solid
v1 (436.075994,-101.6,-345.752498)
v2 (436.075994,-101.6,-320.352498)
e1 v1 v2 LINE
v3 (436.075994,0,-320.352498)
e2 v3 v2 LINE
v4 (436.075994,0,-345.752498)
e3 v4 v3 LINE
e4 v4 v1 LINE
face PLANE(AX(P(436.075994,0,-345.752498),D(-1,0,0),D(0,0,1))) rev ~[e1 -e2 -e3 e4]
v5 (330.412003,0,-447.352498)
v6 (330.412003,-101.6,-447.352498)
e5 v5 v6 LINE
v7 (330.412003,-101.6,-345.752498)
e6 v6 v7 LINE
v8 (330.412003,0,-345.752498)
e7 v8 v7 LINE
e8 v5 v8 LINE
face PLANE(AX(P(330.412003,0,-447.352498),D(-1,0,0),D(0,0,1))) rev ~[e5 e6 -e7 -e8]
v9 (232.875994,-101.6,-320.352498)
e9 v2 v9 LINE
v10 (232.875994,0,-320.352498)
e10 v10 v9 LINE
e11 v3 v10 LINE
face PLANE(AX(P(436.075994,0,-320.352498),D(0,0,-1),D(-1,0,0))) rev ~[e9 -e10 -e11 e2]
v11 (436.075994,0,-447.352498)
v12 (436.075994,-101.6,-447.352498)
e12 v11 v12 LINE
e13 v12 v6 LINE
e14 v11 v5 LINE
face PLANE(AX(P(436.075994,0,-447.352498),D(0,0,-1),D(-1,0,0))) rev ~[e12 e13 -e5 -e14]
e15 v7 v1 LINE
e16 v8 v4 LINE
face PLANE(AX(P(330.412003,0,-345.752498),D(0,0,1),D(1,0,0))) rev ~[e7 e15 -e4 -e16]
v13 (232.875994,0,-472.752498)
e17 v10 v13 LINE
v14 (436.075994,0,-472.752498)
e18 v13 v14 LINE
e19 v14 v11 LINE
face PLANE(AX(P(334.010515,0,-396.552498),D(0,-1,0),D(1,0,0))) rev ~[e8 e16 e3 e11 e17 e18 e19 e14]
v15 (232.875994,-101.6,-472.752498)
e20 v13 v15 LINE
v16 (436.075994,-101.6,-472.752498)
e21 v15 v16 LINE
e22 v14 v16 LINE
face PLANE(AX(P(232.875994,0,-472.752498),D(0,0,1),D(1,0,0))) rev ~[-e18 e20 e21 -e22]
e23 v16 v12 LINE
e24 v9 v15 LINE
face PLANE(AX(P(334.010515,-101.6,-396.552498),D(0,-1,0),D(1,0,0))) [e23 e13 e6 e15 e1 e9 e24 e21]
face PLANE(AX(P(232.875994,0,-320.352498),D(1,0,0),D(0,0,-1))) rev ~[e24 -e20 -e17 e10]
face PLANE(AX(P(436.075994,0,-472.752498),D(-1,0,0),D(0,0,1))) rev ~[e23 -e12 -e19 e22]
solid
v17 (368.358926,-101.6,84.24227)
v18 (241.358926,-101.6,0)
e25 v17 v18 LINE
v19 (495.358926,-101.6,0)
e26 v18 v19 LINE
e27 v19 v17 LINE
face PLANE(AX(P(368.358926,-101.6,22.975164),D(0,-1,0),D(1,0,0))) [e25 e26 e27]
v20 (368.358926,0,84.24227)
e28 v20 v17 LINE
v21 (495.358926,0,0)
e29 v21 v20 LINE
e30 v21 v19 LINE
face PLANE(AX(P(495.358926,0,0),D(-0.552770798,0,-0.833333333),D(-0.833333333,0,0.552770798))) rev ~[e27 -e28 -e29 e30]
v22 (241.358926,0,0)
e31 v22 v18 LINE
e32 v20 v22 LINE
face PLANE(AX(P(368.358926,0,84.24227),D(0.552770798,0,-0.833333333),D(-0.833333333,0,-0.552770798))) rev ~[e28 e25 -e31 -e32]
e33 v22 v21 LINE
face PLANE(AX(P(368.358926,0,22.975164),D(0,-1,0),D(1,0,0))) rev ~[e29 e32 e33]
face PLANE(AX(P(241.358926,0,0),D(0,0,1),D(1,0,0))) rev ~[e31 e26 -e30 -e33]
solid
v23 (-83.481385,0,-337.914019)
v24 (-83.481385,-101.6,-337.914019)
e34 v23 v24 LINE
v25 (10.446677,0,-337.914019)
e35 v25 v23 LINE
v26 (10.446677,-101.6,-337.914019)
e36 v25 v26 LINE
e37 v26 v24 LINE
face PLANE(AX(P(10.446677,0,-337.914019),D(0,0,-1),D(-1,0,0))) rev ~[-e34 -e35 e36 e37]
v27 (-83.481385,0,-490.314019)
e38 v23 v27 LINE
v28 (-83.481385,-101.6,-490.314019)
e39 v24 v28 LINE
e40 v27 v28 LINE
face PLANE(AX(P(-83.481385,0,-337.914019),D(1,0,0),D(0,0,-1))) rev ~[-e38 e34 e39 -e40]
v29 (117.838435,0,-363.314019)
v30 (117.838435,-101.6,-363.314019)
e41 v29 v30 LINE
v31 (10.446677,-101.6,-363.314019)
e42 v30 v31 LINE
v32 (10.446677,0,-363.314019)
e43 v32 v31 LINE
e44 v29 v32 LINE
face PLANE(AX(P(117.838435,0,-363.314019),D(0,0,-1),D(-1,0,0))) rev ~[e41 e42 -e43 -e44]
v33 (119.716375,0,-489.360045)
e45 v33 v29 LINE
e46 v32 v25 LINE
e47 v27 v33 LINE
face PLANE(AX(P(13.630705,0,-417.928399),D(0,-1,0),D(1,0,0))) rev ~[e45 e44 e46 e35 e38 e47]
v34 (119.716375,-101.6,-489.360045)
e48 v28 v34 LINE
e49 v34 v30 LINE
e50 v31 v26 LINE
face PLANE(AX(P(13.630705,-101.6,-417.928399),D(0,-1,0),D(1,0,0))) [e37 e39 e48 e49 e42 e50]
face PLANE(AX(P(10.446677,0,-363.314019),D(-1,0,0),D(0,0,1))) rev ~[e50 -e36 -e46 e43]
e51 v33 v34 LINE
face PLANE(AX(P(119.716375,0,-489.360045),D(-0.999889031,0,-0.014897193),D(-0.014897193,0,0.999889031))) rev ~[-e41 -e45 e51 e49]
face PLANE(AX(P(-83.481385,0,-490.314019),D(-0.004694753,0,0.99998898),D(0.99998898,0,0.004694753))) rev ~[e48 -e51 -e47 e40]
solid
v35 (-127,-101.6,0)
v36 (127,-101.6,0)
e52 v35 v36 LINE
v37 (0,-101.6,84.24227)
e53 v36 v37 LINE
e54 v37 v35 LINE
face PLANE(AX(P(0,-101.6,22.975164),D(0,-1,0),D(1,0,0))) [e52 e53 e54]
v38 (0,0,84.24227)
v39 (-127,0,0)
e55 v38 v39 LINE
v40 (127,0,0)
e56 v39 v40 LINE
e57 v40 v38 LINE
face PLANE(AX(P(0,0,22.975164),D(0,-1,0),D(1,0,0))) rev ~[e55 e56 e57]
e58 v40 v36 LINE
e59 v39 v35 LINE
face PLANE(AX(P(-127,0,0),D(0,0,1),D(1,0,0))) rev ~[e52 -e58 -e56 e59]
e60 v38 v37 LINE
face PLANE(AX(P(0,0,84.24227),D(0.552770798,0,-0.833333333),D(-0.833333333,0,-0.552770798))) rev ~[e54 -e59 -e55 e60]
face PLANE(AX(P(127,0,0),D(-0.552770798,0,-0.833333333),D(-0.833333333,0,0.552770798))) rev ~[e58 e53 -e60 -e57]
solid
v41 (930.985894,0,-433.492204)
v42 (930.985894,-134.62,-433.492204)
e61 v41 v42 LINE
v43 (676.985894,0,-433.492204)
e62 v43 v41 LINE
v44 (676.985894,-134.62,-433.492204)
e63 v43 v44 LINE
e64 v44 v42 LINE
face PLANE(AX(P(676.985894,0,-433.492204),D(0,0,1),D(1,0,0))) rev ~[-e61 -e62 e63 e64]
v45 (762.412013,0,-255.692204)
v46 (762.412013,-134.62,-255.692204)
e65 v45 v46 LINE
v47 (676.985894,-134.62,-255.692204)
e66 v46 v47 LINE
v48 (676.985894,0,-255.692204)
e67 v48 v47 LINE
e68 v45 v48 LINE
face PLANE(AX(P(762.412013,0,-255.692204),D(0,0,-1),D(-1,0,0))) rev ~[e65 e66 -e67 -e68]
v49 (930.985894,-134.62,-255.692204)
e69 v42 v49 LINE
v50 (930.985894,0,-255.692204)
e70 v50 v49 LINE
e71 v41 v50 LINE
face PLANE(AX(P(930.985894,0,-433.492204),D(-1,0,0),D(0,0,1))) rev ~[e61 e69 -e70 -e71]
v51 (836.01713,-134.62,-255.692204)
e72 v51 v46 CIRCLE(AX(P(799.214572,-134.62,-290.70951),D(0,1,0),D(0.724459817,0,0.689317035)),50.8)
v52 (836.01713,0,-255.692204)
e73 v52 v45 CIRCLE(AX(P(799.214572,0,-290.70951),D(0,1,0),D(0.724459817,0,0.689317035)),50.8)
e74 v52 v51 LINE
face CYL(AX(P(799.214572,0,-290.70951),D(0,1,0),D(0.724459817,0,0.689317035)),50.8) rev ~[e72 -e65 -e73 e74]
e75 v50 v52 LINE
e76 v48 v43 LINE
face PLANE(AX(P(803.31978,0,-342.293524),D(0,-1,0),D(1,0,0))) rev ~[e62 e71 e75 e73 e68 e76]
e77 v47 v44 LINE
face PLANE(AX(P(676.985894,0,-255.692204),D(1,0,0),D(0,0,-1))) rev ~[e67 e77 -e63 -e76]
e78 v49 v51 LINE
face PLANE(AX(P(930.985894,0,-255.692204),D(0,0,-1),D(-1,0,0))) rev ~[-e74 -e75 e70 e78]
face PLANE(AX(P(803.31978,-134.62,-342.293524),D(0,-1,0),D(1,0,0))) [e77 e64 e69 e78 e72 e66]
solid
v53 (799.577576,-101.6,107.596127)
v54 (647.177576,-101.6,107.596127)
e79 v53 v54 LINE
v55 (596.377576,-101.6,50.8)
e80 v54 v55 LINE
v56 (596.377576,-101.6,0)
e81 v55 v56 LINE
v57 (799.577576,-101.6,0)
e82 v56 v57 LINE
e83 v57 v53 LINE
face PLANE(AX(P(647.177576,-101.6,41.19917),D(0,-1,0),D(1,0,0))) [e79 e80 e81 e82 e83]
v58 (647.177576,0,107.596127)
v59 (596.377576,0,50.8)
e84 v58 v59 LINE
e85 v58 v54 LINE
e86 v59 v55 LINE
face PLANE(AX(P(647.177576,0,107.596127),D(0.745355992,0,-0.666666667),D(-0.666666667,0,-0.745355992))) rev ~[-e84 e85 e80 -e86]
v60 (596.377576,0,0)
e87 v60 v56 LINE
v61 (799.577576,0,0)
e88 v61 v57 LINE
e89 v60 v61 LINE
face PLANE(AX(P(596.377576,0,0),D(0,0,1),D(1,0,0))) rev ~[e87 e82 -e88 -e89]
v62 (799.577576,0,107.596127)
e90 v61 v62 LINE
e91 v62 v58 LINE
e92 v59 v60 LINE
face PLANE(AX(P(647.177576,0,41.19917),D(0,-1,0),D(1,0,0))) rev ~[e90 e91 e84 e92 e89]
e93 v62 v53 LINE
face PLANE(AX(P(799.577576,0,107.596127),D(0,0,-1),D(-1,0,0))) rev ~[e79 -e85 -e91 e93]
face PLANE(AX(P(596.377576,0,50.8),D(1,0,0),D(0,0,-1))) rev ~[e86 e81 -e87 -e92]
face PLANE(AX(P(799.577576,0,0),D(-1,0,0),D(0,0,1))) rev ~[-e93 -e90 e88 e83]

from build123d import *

# Parameters (mm, degrees)
F1_DEPTH  = 101.6
F3_DEPTH  = 101.6
F4_W      = 101.6
F4_H      = 50.8
F5_DEPTH  = 101.6
F7_DEPTH  = 101.6
F9_DEPTH  = 101.6
F11_DEPTH = 101.6
F13_DEPTH = 134.62


with BuildPart() as f1:
    # F0 (on Front) → F1 (new body)
    with BuildSketch(Plane.XZ):
        Polygon((0, 84.242269675), (-127, 0), (127, 0), align=None)
    extrude(amount=F1_DEPTH)

    # F8 (on Front) → F9 (cut)
    with BuildSketch(Plane.XZ):
        Polygon((352.6244014331, -321.0040116787), (352.6244014331, -473.4040116787), (555.8244014331, -473.4040116787), (555.8244014331, -448.0040116787), (454.2244014331, -448.0040116787), (454.2244014331, -346.4040116787), (555.8244014331, -346.4040116787), (555.8244014331, -321.0040116787), align=None)
    extrude(amount=-F9_DEPTH, mode=Mode.SUBTRACT)


with BuildPart() as f3:
    # F2 (on Front) → F3 (new body)
    with BuildSketch(Plane.XZ):
        Polygon((368.3589263118, 84.242269675), (241.3589263118, 0), (495.3589263118, 0), align=None)
    extrude(amount=F3_DEPTH)


with BuildPart() as f5:
    # F4 (on Front) → F5 (new body)
    with BuildSketch(Plane.XZ):
        Polygon((596.3775763313, 50.8), (596.3775763313, 0), (697.9775763313, 0), (697.9775763313, 50.8), (647.1775763313, 107.5961266285), align=None)
        Polygon((799.5775763313, 107.5961266285), (647.1775763313, 107.5961266285), (697.9775763313, 50.8), (799.5775763313, 50.8), align=None)
        with Locations((748.7775763313, 25.4)):
            Rectangle(F4_W, F4_H)
    extrude(amount=F5_DEPTH)


with BuildPart() as f7:
    # F6 (on Front) → F7 (new body)
    with BuildSketch(Plane.XZ):
        Polygon((10.4466769844, -337.9140185932), (-83.4813854448, -337.9140185932), (-83.4813854448, -490.3140185932), (119.7163752071, -489.3600447649), (117.838434875, -363.3140185932), (10.4466769844, -363.3140185932), align=None)
    extrude(amount=F7_DEPTH)


with BuildPart() as f11:
    # F10 (on Front) → F11 (new body)
    with BuildSketch(Plane.XZ):
        Polygon((232.8759941101, -320.3524975159), (232.8759941101, -472.7524975159), (436.0759941101, -472.7524975159), (436.0759941101, -447.3524975159), (330.4120034046, -447.3524975159), (330.4120034046, -345.7524975159), (436.0759941101, -345.7524975159), (436.0759941101, -320.3524975159), align=None)
    extrude(amount=F11_DEPTH)


with BuildPart() as f13:
    # F12 (on Front) → F13 (new body)
    with BuildSketch(Plane.XZ):
        with BuildLine():
            Line((676.9858937263, -255.6922041467), (676.9858937263, -433.4922041467))
            Line((676.9858937263, -433.4922041467), (930.9858937263, -433.4922041467))
            Line((930.9858937263, -433.4922041467), (930.9858937263, -255.6922041467))
            Line((930.9858937263, -255.6922041467), (836.0171303992, -255.6922041467))
            ThreePointArc((836.0171303992, -255.6922041467), (799.2145717144, -341.5095095006), (762.4120130296, -255.6922041467))
            Line((762.4120130296, -255.6922041467), (676.9858937263, -255.6922041467))
        make_face()
    extrude(amount=F13_DEPTH)


solid = Compound([f1.part, f3.part, f5.part, f7.part, f11.part, f13.part])
